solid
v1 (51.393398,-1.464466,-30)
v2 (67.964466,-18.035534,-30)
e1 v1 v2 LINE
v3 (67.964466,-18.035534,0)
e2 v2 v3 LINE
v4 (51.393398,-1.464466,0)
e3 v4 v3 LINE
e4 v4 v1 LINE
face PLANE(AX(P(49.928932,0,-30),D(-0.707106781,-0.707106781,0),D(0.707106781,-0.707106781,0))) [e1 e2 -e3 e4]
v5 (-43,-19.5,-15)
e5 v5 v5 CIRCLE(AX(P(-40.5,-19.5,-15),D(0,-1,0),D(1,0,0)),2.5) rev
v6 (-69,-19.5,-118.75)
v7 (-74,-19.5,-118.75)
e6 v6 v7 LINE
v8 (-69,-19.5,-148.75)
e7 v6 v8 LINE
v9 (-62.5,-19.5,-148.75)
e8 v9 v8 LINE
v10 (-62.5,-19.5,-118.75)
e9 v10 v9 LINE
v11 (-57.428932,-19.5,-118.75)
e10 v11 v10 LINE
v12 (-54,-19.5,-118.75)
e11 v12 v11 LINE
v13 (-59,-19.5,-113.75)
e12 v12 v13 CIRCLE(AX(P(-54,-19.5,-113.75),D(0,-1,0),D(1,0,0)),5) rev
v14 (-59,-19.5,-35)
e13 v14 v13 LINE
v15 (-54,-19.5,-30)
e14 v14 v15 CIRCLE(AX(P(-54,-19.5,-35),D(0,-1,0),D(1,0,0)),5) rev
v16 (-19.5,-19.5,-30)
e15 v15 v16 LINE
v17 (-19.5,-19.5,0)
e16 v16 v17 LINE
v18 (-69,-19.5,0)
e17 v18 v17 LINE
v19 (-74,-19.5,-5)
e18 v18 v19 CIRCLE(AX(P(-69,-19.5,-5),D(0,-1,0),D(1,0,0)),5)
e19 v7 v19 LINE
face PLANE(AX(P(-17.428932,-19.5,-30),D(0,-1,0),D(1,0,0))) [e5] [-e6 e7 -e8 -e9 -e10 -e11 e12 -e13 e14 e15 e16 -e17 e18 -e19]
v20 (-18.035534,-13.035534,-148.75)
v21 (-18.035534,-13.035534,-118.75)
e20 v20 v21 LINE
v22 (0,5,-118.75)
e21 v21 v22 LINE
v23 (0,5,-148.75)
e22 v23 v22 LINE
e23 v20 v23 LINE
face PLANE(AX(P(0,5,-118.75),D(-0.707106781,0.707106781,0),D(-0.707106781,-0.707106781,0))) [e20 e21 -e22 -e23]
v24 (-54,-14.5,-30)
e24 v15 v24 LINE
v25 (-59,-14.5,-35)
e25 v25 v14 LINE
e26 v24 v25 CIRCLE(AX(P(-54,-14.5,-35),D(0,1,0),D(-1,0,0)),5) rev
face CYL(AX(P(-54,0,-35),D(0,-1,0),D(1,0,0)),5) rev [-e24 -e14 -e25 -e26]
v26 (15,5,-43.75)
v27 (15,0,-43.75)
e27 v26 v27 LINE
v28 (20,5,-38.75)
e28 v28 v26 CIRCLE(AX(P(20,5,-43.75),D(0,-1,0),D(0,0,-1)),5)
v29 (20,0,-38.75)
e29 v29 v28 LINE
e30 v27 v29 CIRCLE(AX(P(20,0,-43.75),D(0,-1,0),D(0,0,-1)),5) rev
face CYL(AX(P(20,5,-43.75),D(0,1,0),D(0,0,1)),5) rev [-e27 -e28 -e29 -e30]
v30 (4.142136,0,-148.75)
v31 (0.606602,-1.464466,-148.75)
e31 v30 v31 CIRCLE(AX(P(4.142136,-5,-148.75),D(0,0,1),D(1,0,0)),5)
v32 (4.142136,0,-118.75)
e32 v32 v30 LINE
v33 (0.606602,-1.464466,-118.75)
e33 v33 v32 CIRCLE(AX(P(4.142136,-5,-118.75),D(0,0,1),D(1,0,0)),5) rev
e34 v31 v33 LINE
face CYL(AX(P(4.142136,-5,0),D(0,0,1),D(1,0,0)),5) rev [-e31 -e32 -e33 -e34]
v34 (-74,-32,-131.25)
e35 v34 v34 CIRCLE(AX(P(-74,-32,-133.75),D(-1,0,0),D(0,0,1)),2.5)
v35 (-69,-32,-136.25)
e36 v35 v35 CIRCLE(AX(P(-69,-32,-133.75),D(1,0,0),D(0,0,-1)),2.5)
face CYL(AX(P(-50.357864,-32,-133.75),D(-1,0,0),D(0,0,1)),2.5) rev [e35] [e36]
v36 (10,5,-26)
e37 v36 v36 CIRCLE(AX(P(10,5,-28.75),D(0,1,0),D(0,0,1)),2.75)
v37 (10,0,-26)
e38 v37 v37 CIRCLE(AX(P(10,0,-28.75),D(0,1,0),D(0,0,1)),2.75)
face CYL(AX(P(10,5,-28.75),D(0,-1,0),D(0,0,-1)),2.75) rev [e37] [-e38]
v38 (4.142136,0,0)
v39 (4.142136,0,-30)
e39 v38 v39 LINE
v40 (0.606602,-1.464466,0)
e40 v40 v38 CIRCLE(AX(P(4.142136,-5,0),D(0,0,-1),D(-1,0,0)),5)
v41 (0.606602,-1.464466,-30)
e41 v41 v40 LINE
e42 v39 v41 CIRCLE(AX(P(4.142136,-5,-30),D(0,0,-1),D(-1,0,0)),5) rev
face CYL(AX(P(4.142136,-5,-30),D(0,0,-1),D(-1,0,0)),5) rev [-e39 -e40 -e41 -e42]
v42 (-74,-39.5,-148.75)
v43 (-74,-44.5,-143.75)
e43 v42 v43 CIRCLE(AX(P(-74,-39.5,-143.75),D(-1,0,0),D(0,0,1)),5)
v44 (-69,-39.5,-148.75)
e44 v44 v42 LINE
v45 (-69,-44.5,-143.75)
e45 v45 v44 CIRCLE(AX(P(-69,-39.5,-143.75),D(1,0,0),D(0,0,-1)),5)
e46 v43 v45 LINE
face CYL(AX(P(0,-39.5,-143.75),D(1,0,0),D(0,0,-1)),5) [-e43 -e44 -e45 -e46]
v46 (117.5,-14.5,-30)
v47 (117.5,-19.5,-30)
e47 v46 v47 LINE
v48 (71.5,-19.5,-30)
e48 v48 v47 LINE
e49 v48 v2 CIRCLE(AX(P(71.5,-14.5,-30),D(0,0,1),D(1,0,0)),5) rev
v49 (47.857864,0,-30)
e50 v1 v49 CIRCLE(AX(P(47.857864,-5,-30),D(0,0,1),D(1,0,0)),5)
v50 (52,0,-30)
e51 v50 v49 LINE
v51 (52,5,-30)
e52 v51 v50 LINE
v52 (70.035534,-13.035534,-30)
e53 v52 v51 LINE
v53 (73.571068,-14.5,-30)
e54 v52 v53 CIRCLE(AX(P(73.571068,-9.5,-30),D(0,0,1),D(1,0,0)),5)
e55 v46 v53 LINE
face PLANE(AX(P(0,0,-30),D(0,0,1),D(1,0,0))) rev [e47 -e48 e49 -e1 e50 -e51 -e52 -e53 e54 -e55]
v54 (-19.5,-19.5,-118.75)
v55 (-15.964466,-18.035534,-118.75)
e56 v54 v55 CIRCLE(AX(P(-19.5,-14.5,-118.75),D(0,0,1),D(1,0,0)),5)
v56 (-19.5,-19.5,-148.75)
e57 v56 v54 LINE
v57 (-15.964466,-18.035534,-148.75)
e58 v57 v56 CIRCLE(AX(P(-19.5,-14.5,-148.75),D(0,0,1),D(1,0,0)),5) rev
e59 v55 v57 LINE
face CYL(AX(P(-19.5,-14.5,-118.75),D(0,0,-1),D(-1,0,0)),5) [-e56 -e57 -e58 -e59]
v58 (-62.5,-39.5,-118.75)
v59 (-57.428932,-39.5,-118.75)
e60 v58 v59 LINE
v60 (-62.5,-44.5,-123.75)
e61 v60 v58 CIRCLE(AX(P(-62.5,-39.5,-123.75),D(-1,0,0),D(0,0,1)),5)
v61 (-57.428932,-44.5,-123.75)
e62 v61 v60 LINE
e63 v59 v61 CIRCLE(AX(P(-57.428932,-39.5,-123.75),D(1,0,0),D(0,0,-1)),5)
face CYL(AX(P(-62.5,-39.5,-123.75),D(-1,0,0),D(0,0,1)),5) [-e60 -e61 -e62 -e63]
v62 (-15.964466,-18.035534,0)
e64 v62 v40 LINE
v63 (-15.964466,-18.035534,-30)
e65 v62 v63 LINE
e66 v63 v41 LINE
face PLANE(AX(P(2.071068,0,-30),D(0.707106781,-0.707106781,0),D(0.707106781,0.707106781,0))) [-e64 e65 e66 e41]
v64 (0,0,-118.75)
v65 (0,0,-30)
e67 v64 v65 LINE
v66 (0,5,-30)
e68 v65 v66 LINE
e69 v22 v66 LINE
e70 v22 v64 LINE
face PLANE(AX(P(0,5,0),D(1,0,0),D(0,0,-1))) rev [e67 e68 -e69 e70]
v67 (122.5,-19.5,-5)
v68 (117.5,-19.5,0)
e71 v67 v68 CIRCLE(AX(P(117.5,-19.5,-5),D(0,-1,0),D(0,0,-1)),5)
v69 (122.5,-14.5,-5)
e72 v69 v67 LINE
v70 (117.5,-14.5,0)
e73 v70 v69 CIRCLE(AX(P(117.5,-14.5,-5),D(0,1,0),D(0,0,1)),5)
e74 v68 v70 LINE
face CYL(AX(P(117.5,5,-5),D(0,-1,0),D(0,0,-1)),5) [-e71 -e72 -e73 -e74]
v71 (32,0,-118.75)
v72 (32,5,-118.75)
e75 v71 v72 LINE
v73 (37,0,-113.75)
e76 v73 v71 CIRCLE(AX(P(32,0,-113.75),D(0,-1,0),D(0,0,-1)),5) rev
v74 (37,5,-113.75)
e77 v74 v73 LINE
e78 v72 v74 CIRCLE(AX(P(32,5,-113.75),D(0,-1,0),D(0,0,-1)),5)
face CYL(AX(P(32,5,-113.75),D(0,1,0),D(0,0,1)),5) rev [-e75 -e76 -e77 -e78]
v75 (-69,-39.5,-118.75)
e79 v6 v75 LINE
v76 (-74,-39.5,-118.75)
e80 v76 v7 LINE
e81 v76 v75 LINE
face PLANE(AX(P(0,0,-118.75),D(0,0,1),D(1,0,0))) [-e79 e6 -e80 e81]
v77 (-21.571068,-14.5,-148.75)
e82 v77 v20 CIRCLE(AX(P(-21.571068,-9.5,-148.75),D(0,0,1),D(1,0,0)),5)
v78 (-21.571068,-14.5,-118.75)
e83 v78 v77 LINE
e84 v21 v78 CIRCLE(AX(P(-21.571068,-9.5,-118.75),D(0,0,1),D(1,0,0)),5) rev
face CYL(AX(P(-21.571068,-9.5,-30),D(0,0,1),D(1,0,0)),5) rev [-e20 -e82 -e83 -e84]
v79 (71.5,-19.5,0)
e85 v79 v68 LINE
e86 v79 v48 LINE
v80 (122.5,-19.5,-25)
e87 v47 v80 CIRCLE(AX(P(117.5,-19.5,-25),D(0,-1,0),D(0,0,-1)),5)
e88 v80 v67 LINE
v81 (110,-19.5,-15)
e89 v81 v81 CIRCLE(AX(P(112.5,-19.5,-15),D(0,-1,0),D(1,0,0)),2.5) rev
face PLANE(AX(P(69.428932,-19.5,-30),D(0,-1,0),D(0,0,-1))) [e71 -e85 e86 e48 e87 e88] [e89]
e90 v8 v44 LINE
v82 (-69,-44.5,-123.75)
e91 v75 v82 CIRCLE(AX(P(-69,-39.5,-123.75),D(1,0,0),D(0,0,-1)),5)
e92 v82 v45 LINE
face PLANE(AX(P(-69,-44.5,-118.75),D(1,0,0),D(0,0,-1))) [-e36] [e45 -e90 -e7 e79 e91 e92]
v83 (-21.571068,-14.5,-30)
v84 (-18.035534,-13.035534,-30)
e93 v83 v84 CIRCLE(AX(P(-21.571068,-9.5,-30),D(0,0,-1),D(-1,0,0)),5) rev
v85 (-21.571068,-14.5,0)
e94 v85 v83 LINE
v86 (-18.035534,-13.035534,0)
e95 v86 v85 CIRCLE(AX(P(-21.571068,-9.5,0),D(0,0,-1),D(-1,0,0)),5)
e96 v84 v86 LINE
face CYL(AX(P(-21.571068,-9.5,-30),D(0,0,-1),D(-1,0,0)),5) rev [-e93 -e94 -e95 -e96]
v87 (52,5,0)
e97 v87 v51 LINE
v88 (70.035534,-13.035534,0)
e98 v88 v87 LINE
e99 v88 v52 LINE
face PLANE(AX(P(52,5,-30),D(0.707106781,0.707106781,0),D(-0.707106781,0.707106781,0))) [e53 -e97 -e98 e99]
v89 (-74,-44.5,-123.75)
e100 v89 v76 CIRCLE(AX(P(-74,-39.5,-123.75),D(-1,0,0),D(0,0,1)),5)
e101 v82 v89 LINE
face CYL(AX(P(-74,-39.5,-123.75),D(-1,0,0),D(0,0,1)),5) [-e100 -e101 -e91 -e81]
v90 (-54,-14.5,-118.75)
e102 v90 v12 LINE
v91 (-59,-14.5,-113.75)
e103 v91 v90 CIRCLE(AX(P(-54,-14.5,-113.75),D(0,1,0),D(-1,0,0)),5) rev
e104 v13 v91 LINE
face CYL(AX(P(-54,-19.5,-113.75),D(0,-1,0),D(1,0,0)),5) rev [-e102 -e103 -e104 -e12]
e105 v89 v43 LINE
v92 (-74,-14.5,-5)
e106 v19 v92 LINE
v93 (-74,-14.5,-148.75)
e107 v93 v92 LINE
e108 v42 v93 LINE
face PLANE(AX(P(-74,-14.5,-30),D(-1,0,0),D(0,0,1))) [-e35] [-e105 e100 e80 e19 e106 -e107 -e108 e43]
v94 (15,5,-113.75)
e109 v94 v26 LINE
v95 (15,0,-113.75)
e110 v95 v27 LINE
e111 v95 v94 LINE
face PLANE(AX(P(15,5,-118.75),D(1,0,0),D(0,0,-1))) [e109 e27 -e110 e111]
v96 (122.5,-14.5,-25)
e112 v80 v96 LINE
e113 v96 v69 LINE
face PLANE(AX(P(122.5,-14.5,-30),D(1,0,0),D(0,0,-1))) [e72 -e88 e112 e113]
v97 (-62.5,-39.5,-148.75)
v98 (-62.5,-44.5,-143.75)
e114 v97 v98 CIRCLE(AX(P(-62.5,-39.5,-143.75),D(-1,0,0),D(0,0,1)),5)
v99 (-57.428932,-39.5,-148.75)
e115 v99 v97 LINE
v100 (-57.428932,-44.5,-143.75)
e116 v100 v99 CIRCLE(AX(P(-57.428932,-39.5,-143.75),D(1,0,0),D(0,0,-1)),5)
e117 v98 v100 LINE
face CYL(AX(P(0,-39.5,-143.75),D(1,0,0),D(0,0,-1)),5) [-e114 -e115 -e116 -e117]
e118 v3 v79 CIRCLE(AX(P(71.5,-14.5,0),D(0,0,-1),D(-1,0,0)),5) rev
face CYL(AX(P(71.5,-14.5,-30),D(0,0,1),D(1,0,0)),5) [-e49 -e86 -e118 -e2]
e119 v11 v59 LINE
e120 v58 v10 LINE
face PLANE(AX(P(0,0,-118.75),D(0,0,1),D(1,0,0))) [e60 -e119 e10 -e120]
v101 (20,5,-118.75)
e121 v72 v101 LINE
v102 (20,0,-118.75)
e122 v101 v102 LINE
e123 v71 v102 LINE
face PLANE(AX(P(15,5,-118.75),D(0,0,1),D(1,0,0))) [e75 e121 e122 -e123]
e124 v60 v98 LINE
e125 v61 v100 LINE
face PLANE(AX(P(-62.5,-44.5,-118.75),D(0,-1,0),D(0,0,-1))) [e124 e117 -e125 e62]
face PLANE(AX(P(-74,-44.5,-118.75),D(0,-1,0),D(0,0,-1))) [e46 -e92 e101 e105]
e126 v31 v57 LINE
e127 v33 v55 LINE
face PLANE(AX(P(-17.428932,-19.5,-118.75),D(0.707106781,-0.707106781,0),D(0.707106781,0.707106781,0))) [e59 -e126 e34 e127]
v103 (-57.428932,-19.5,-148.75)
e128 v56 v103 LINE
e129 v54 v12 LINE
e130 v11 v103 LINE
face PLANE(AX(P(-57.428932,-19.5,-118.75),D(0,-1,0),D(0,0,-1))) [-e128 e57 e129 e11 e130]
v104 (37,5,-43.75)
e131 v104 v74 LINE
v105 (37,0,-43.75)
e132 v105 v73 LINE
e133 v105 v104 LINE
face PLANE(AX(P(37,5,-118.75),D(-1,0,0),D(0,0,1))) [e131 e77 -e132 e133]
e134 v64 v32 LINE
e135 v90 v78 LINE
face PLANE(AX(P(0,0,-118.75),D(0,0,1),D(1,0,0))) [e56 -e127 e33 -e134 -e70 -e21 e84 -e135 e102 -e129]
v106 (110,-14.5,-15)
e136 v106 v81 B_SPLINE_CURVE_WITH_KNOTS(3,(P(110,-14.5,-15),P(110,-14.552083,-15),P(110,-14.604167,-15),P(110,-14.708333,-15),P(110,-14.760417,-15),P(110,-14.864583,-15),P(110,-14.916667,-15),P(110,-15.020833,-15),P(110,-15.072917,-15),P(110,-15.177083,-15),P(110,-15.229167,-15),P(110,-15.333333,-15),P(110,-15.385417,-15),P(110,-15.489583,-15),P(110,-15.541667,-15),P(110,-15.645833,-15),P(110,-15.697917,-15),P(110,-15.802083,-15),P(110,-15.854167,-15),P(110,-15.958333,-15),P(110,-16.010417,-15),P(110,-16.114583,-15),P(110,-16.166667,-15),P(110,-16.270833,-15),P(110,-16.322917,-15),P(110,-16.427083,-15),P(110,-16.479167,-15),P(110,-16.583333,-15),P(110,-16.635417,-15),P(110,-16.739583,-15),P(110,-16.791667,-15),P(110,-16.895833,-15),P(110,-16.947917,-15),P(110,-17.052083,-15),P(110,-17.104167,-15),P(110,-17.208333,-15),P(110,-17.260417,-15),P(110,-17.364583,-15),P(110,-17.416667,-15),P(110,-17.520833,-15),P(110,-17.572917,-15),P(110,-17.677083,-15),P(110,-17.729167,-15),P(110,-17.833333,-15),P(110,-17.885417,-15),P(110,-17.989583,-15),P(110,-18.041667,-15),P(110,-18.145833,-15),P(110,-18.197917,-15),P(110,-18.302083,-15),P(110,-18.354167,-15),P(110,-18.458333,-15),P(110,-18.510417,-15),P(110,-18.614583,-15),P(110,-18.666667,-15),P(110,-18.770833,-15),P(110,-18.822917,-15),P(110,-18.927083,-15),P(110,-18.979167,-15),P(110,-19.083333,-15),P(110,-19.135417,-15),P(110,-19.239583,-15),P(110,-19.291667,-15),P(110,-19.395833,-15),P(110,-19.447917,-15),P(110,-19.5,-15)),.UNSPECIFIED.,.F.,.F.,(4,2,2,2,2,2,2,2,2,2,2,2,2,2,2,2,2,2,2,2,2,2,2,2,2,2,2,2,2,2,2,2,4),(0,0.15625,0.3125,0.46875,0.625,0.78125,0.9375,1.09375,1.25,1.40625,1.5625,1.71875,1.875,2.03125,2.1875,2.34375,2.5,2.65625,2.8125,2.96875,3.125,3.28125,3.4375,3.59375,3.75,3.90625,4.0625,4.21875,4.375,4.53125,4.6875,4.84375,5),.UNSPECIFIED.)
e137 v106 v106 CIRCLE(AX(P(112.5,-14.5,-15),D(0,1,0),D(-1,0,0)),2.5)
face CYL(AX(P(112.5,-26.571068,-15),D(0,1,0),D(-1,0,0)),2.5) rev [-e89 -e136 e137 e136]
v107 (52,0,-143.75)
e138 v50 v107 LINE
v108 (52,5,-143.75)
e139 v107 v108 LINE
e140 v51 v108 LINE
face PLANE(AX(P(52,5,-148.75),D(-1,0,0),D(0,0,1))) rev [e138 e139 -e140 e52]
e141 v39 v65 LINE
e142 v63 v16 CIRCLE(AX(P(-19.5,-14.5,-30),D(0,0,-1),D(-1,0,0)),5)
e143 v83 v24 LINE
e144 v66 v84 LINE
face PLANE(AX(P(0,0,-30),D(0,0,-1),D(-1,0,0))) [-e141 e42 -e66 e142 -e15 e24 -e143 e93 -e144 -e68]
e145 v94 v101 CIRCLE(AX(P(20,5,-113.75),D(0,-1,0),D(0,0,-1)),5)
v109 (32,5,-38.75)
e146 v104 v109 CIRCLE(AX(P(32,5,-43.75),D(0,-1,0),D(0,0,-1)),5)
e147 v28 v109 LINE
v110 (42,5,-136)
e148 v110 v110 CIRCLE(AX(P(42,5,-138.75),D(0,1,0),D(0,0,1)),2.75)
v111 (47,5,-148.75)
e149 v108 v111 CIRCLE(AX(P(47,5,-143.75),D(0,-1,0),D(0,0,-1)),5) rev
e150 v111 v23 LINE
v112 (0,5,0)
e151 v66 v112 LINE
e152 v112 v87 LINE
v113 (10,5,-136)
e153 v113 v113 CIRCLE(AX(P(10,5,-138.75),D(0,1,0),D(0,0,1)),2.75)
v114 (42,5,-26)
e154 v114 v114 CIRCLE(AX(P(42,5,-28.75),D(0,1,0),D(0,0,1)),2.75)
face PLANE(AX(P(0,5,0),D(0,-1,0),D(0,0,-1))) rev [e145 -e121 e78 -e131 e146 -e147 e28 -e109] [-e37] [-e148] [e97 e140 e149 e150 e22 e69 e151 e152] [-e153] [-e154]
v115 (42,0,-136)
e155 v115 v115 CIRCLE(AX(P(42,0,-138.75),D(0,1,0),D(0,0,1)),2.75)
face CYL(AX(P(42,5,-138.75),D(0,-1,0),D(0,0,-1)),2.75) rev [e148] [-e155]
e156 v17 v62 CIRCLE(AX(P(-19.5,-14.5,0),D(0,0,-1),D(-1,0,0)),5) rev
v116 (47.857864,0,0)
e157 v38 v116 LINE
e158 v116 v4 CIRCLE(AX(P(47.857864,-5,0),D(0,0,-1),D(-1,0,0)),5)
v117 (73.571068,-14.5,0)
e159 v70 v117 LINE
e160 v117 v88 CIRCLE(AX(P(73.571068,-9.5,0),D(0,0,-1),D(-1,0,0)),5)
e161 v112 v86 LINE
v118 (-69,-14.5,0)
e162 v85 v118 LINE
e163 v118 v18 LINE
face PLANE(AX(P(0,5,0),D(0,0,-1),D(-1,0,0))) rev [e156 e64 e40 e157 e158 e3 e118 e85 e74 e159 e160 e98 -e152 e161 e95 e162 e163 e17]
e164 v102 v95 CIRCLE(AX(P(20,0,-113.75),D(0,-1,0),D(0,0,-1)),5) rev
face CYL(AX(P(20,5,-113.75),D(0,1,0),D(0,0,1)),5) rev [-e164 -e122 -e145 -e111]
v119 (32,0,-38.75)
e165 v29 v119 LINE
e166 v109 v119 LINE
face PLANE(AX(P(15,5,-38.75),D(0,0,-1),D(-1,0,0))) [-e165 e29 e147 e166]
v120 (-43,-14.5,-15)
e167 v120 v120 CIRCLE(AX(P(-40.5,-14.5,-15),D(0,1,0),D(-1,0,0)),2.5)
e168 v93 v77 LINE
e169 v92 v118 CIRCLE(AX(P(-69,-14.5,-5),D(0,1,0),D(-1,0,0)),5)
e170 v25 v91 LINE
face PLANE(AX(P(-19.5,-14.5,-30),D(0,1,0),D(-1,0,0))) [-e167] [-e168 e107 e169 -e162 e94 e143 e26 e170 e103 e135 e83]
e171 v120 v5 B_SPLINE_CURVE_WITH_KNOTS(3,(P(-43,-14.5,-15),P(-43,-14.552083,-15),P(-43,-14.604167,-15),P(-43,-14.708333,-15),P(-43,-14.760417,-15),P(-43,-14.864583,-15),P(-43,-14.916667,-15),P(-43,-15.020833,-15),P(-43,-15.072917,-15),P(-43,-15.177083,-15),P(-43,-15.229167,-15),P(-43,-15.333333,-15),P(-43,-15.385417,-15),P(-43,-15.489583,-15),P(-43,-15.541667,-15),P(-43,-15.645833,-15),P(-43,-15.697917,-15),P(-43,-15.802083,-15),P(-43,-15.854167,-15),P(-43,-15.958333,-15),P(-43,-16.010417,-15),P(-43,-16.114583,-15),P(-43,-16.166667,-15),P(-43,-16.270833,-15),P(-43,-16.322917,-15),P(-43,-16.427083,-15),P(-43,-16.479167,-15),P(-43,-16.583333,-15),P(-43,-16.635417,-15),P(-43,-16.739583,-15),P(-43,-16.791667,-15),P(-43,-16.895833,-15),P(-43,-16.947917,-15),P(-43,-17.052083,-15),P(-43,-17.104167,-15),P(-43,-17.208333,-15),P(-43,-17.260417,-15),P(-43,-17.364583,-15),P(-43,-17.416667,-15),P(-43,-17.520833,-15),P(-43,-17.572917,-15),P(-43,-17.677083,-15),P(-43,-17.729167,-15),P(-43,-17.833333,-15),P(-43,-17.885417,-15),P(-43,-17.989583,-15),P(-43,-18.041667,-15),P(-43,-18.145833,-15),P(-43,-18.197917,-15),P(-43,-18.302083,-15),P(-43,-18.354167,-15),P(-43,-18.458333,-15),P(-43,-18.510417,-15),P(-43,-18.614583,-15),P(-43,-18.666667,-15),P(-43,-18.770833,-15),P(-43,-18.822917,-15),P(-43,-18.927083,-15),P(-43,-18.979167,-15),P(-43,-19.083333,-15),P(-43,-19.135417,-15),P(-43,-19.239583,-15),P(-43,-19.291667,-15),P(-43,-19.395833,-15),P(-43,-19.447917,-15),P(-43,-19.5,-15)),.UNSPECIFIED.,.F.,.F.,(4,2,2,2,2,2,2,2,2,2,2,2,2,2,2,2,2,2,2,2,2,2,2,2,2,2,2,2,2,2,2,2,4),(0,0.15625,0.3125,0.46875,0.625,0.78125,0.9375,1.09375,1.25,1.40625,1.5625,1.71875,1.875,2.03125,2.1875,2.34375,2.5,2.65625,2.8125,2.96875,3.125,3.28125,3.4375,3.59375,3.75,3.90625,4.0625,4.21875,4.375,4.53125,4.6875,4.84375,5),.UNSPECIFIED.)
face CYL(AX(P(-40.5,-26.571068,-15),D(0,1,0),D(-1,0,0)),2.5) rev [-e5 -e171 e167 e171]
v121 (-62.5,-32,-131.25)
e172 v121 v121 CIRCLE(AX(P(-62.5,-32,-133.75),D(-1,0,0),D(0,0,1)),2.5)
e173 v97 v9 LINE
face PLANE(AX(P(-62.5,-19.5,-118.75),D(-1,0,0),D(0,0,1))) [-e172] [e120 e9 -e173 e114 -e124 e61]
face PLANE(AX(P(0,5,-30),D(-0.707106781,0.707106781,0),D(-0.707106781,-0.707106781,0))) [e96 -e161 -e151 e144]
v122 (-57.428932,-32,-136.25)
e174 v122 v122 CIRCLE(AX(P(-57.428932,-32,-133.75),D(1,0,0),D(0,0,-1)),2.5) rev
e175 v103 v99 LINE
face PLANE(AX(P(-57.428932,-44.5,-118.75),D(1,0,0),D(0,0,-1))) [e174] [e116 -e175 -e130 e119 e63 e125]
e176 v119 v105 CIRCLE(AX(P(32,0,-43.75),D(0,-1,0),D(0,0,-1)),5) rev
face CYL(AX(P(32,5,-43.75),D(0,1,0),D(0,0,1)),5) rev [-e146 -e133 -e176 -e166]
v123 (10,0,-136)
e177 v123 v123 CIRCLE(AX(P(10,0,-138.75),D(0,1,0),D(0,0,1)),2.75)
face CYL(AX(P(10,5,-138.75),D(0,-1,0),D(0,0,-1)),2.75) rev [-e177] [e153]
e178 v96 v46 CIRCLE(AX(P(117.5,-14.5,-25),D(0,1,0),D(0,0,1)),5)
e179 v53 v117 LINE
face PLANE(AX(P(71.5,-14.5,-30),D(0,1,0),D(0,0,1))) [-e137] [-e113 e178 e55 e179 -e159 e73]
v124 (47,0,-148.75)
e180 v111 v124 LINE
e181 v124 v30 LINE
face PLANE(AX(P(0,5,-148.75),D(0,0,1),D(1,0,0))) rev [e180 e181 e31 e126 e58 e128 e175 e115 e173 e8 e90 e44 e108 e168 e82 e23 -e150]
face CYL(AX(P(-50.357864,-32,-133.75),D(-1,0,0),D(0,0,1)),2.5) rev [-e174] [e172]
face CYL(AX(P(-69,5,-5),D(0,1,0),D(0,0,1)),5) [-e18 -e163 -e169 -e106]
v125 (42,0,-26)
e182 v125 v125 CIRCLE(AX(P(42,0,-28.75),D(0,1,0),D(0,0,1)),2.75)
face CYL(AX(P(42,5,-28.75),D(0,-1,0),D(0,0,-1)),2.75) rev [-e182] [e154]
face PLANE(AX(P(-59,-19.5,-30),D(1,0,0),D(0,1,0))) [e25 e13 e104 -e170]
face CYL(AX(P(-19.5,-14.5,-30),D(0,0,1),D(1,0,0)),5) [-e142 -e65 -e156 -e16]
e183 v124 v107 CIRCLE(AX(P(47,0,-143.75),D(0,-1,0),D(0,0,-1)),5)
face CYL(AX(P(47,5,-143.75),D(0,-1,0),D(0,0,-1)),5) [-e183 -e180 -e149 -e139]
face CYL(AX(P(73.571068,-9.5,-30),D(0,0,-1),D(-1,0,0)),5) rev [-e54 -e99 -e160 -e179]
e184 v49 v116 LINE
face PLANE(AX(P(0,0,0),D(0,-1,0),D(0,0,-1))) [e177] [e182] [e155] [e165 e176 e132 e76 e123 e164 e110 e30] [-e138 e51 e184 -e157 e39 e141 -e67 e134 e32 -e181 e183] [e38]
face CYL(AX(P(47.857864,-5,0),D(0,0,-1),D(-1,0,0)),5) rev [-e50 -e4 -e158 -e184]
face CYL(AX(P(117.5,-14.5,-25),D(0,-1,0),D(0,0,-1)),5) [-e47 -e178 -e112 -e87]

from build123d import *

# Parameters (mm, degrees)
SKETCH1_W           = 52
SKETCH1_H           = 148.75
SKETCH1_R           = 2.75
SKETCH1_W_2         = 22
SKETCH1_H_2         = 80
BOSS_EXTRUDE2_DEPTH = 5
BOSS_EXTRUDE3_DEPTH = 30
BOSS_EXTRUDE5_DEPTH = 30
SKETCH3_R           = 2.5
CUT_EXTRUDE1_DEPTH  = 5
CUT_EXTRUDE2_REACH  = 252.438
SKETCH5_R           = 2.5
SKETCH6_W           = 15
SKETCH6_H           = 88.75
BOSS_EXTRUDE6_DEPTH = 5
FILLET1_R           = 5
FILLET2_R           = 5


with BuildPart() as part:
    # Sketch1 → Boss-Extrude2 (new body)
    with BuildSketch(Plane(origin=(0, 0, 0), x_dir=(1, 0, 0), z_dir=(0, 1, 0))):
        with Locations((26, 74.375)):
            Rectangle(SKETCH1_W, SKETCH1_H)
        with Locations(Location((10, 28.75, 0), (0, 0, 270))):
            Circle(SKETCH1_R, mode=Mode.SUBTRACT)
        with Locations(Location((42, 28.75, 0), (0, 0, 270))):
            Circle(SKETCH1_R, mode=Mode.SUBTRACT)
        with Locations(Location((10, 138.75, 0), (0, 0, 270))):
            Circle(SKETCH1_R, mode=Mode.SUBTRACT)
        with Locations(Location((42, 138.75, 0), (0, 0, 270))):
            Circle(SKETCH1_R, mode=Mode.SUBTRACT)
        with Locations((26, 78.75)):
            Rectangle(SKETCH1_W_2, SKETCH1_H_2, mode=Mode.SUBTRACT)
    extrude(amount=BOSS_EXTRUDE2_DEPTH)

    # Sketch2 → Boss-Extrude3 (add)
    with BuildSketch(Plane.XY):
        Polygon((0, 5), (0, 0), (2.071067812, 0), (-17.428932188, -19.5), (-74, -19.5), (-74, -14.5), (-19.5, -14.5), align=None)
        Polygon((71.5, -14.5), (122.5, -14.5), (122.5, -19.5), (69.428932188, -19.5), (49.928932188, 0), (52, 0), (52, 5), align=None)
    extrude(amount=-BOSS_EXTRUDE3_DEPTH)

    # Sketch4 → Boss-Extrude5 (add)
    with BuildSketch(Plane(origin=(0, 0, -148.75), x_dir=(-1, 0, 0), z_dir=(0, 0, -1))):
        Polygon((74, -14.5), (74, -44.5), (69, -44.5), (69, -19.5), (62.5, -19.5), (62.5, -44.5), (57.428932188, -44.5), (57.428932188, -19.5), (17.428932188, -19.5), (-2.071067812, 0), (0, 0), (0, 5), (19.5, -14.5), align=None)
    extrude(amount=-BOSS_EXTRUDE5_DEPTH)

    # Sketch3 → Cut-Extrude1 (cut)
    with BuildSketch(Plane(origin=(0, -14.5, 0), x_dir=(1, 0, 0), z_dir=(0, 1, 0))):
        with Locations(Location((-40.5, 15, 0), (0, 0, 180))):
            Circle(SKETCH3_R)
        with Locations(Location((112.5, 15, 0), (0, 0, 180))):
            Circle(SKETCH3_R)
    extrude(amount=-CUT_EXTRUDE1_DEPTH, mode=Mode.SUBTRACT)

    # Cut-Extrude2: up to this face of the body (flat: up to its plane)
    cut_extrude2_end = Plane(part.part.faces().sort_by_distance((-57.428932188, -32, -133.75))[0])
    # Sketch5 → Cut-Extrude2 (cut, up to the picked face)
    with BuildSketch(Plane.ZY.offset(74), mode=Mode.PRIVATE) as cut_extrude2_sk1:
        with Locations((-133.75, -32)):
            Circle(SKETCH5_R)
    cut_extrude2_tool1 = split(extrude(cut_extrude2_sk1.sketch, amount=-CUT_EXTRUDE2_REACH, mode=Mode.PRIVATE), bisect_by=cut_extrude2_end, keep=Keep.BOTH, mode=Mode.PRIVATE)
    add(cut_extrude2_tool1.solids().sort_by(Axis((-74, -32, -133.75), (1, 0, 0)))[0], mode=Mode.SUBTRACT)

    # Sketch6 → Boss-Extrude6 (add)
    with BuildSketch(Plane(origin=(0, -14.5, 0), x_dir=(1, 0, 0), z_dir=(0, 1, 0))):
        with Locations((-66.5, 74.375)):
            Rectangle(SKETCH6_W, SKETCH6_H)
    extrude(amount=-BOSS_EXTRUDE6_DEPTH)

    # Fillet1
    # the kernel refuses this fillet: 5 mm, written as the material it adds along each edge
    with BuildSketch(Plane(origin=(-59, -14.5, -118.75), x_dir=(0, 0, 1), z_dir=(0, -1, 0)), Plane(origin=(-59, -14.5, -30), x_dir=(1, 0, 0), z_dir=(0, -1, 0)), Plane(origin=(15, 0, -118.75), x_dir=(1, 0, 0), z_dir=(0, 1, 0))) as fillet1_piece_1:
        with BuildLine():
            CenterArc((FILLET1_R, -FILLET1_R), FILLET1_R, 90, 90)
            Line((0, -FILLET1_R), (0, 0))
            Line((0, 0), (FILLET1_R, 0))
        make_face()
    extrude(amount=5)
    with BuildSketch(Plane(origin=(15, 0, -38.75), x_dir=(1, 0, 0), z_dir=(0, 1, 0)), Plane(origin=(37, 0, -38.75), x_dir=(0, 0, -1), z_dir=(0, 1, 0)), Plane(origin=(37, 0, -118.75), x_dir=(-1, 0, 0), z_dir=(0, 1, 0))) as fillet1_piece_2:
        with BuildLine():
            CenterArc((FILLET1_R, FILLET1_R), FILLET1_R, 180, 90)
            Line((0, FILLET1_R), (0, 0))
            Line((0, 0), (FILLET1_R, 0))
        make_face()
    extrude(amount=5)
    # the kernel refuses this fillet: 5 mm, written as the material it takes off along each edge
    with BuildSketch(Plane(origin=(-74, -32, 0), x_dir=(1, 0, 0), z_dir=(0, 1, 0)), Plane(origin=(122.5, -2, 0), x_dir=(-1, 0, 0), z_dir=(0, -1, 0)), Plane(origin=(52, -12.5, -148.75), x_dir=(-1, 0, 0), z_dir=(0, 1, 0)), Plane(origin=(-86.5, -44.5, -148.75), x_dir=(0, 1, 0), z_dir=(1, 0, 0))) as fillet1_2_piece_1:
        with BuildLine():
            CenterArc((FILLET1_R, FILLET1_R), FILLET1_R, 180, 90)
            Line((0, FILLET1_R), (0, 0))
            Line((0, 0), (FILLET1_R, 0))
        make_face()
    extrude(amount=30, mode=Mode.SUBTRACT)
    with BuildSketch(Plane(origin=(122.5, -2, -30), x_dir=(-1, 0, 0), z_dir=(0, -1, 0)), Plane(origin=(-86.5, -44.5, -118.75), x_dir=(0, 1, 0), z_dir=(1, 0, 0))) as fillet1_2_piece_2:
        with BuildLine():
            CenterArc((FILLET1_R, -FILLET1_R), FILLET1_R, 90, 90)
            Line((0, -FILLET1_R), (0, 0))
            Line((0, 0), (FILLET1_R, 0))
        make_face()
    extrude(amount=30, mode=Mode.SUBTRACT)
    with BuildSketch(Plane(origin=(-75, -44.5, -118.75), x_dir=(0, 1, 0), z_dir=(1, 0, 0))) as fillet1_2_piece_3:
        with BuildLine():
            CenterArc((FILLET1_R, -FILLET1_R), FILLET1_R, 90, 90)
            Line((0, -FILLET1_R), (0, 0))
            Line((0, 0), (FILLET1_R, 0))
        make_face()
    extrude(amount=30.071067812, mode=Mode.SUBTRACT)
    with BuildSketch(Plane(origin=(-75, -44.5, -148.75), x_dir=(0, 1, 0), z_dir=(1, 0, 0))) as fillet1_2_piece_4:
        with BuildLine():
            CenterArc((FILLET1_R, FILLET1_R), FILLET1_R, 180, 90)
            Line((0, FILLET1_R), (0, 0))
            Line((0, 0), (FILLET1_R, 0))
        make_face()
    extrude(amount=30.071067812, mode=Mode.SUBTRACT)

    # Fillet2
    fillet2_edges = [part.edges().sort_by_distance(p)[0] for p in [
        (-19.5, -14.5, -15),
        (2.071067812, 0, -15),
        (-17.428932188, -19.5, -15),
        (49.928932188, 0, -15),
        (71.5, -14.5, -15),
        (69.428932188, -19.5, -15),
        (-19.5, -14.5, -133.75),
        (-17.428932188, -19.5, -133.75),
        (2.071067812, 0, -133.75),
    ]]
    fillet(fillet2_edges, radius=FILLET2_R)


solid = part.part
